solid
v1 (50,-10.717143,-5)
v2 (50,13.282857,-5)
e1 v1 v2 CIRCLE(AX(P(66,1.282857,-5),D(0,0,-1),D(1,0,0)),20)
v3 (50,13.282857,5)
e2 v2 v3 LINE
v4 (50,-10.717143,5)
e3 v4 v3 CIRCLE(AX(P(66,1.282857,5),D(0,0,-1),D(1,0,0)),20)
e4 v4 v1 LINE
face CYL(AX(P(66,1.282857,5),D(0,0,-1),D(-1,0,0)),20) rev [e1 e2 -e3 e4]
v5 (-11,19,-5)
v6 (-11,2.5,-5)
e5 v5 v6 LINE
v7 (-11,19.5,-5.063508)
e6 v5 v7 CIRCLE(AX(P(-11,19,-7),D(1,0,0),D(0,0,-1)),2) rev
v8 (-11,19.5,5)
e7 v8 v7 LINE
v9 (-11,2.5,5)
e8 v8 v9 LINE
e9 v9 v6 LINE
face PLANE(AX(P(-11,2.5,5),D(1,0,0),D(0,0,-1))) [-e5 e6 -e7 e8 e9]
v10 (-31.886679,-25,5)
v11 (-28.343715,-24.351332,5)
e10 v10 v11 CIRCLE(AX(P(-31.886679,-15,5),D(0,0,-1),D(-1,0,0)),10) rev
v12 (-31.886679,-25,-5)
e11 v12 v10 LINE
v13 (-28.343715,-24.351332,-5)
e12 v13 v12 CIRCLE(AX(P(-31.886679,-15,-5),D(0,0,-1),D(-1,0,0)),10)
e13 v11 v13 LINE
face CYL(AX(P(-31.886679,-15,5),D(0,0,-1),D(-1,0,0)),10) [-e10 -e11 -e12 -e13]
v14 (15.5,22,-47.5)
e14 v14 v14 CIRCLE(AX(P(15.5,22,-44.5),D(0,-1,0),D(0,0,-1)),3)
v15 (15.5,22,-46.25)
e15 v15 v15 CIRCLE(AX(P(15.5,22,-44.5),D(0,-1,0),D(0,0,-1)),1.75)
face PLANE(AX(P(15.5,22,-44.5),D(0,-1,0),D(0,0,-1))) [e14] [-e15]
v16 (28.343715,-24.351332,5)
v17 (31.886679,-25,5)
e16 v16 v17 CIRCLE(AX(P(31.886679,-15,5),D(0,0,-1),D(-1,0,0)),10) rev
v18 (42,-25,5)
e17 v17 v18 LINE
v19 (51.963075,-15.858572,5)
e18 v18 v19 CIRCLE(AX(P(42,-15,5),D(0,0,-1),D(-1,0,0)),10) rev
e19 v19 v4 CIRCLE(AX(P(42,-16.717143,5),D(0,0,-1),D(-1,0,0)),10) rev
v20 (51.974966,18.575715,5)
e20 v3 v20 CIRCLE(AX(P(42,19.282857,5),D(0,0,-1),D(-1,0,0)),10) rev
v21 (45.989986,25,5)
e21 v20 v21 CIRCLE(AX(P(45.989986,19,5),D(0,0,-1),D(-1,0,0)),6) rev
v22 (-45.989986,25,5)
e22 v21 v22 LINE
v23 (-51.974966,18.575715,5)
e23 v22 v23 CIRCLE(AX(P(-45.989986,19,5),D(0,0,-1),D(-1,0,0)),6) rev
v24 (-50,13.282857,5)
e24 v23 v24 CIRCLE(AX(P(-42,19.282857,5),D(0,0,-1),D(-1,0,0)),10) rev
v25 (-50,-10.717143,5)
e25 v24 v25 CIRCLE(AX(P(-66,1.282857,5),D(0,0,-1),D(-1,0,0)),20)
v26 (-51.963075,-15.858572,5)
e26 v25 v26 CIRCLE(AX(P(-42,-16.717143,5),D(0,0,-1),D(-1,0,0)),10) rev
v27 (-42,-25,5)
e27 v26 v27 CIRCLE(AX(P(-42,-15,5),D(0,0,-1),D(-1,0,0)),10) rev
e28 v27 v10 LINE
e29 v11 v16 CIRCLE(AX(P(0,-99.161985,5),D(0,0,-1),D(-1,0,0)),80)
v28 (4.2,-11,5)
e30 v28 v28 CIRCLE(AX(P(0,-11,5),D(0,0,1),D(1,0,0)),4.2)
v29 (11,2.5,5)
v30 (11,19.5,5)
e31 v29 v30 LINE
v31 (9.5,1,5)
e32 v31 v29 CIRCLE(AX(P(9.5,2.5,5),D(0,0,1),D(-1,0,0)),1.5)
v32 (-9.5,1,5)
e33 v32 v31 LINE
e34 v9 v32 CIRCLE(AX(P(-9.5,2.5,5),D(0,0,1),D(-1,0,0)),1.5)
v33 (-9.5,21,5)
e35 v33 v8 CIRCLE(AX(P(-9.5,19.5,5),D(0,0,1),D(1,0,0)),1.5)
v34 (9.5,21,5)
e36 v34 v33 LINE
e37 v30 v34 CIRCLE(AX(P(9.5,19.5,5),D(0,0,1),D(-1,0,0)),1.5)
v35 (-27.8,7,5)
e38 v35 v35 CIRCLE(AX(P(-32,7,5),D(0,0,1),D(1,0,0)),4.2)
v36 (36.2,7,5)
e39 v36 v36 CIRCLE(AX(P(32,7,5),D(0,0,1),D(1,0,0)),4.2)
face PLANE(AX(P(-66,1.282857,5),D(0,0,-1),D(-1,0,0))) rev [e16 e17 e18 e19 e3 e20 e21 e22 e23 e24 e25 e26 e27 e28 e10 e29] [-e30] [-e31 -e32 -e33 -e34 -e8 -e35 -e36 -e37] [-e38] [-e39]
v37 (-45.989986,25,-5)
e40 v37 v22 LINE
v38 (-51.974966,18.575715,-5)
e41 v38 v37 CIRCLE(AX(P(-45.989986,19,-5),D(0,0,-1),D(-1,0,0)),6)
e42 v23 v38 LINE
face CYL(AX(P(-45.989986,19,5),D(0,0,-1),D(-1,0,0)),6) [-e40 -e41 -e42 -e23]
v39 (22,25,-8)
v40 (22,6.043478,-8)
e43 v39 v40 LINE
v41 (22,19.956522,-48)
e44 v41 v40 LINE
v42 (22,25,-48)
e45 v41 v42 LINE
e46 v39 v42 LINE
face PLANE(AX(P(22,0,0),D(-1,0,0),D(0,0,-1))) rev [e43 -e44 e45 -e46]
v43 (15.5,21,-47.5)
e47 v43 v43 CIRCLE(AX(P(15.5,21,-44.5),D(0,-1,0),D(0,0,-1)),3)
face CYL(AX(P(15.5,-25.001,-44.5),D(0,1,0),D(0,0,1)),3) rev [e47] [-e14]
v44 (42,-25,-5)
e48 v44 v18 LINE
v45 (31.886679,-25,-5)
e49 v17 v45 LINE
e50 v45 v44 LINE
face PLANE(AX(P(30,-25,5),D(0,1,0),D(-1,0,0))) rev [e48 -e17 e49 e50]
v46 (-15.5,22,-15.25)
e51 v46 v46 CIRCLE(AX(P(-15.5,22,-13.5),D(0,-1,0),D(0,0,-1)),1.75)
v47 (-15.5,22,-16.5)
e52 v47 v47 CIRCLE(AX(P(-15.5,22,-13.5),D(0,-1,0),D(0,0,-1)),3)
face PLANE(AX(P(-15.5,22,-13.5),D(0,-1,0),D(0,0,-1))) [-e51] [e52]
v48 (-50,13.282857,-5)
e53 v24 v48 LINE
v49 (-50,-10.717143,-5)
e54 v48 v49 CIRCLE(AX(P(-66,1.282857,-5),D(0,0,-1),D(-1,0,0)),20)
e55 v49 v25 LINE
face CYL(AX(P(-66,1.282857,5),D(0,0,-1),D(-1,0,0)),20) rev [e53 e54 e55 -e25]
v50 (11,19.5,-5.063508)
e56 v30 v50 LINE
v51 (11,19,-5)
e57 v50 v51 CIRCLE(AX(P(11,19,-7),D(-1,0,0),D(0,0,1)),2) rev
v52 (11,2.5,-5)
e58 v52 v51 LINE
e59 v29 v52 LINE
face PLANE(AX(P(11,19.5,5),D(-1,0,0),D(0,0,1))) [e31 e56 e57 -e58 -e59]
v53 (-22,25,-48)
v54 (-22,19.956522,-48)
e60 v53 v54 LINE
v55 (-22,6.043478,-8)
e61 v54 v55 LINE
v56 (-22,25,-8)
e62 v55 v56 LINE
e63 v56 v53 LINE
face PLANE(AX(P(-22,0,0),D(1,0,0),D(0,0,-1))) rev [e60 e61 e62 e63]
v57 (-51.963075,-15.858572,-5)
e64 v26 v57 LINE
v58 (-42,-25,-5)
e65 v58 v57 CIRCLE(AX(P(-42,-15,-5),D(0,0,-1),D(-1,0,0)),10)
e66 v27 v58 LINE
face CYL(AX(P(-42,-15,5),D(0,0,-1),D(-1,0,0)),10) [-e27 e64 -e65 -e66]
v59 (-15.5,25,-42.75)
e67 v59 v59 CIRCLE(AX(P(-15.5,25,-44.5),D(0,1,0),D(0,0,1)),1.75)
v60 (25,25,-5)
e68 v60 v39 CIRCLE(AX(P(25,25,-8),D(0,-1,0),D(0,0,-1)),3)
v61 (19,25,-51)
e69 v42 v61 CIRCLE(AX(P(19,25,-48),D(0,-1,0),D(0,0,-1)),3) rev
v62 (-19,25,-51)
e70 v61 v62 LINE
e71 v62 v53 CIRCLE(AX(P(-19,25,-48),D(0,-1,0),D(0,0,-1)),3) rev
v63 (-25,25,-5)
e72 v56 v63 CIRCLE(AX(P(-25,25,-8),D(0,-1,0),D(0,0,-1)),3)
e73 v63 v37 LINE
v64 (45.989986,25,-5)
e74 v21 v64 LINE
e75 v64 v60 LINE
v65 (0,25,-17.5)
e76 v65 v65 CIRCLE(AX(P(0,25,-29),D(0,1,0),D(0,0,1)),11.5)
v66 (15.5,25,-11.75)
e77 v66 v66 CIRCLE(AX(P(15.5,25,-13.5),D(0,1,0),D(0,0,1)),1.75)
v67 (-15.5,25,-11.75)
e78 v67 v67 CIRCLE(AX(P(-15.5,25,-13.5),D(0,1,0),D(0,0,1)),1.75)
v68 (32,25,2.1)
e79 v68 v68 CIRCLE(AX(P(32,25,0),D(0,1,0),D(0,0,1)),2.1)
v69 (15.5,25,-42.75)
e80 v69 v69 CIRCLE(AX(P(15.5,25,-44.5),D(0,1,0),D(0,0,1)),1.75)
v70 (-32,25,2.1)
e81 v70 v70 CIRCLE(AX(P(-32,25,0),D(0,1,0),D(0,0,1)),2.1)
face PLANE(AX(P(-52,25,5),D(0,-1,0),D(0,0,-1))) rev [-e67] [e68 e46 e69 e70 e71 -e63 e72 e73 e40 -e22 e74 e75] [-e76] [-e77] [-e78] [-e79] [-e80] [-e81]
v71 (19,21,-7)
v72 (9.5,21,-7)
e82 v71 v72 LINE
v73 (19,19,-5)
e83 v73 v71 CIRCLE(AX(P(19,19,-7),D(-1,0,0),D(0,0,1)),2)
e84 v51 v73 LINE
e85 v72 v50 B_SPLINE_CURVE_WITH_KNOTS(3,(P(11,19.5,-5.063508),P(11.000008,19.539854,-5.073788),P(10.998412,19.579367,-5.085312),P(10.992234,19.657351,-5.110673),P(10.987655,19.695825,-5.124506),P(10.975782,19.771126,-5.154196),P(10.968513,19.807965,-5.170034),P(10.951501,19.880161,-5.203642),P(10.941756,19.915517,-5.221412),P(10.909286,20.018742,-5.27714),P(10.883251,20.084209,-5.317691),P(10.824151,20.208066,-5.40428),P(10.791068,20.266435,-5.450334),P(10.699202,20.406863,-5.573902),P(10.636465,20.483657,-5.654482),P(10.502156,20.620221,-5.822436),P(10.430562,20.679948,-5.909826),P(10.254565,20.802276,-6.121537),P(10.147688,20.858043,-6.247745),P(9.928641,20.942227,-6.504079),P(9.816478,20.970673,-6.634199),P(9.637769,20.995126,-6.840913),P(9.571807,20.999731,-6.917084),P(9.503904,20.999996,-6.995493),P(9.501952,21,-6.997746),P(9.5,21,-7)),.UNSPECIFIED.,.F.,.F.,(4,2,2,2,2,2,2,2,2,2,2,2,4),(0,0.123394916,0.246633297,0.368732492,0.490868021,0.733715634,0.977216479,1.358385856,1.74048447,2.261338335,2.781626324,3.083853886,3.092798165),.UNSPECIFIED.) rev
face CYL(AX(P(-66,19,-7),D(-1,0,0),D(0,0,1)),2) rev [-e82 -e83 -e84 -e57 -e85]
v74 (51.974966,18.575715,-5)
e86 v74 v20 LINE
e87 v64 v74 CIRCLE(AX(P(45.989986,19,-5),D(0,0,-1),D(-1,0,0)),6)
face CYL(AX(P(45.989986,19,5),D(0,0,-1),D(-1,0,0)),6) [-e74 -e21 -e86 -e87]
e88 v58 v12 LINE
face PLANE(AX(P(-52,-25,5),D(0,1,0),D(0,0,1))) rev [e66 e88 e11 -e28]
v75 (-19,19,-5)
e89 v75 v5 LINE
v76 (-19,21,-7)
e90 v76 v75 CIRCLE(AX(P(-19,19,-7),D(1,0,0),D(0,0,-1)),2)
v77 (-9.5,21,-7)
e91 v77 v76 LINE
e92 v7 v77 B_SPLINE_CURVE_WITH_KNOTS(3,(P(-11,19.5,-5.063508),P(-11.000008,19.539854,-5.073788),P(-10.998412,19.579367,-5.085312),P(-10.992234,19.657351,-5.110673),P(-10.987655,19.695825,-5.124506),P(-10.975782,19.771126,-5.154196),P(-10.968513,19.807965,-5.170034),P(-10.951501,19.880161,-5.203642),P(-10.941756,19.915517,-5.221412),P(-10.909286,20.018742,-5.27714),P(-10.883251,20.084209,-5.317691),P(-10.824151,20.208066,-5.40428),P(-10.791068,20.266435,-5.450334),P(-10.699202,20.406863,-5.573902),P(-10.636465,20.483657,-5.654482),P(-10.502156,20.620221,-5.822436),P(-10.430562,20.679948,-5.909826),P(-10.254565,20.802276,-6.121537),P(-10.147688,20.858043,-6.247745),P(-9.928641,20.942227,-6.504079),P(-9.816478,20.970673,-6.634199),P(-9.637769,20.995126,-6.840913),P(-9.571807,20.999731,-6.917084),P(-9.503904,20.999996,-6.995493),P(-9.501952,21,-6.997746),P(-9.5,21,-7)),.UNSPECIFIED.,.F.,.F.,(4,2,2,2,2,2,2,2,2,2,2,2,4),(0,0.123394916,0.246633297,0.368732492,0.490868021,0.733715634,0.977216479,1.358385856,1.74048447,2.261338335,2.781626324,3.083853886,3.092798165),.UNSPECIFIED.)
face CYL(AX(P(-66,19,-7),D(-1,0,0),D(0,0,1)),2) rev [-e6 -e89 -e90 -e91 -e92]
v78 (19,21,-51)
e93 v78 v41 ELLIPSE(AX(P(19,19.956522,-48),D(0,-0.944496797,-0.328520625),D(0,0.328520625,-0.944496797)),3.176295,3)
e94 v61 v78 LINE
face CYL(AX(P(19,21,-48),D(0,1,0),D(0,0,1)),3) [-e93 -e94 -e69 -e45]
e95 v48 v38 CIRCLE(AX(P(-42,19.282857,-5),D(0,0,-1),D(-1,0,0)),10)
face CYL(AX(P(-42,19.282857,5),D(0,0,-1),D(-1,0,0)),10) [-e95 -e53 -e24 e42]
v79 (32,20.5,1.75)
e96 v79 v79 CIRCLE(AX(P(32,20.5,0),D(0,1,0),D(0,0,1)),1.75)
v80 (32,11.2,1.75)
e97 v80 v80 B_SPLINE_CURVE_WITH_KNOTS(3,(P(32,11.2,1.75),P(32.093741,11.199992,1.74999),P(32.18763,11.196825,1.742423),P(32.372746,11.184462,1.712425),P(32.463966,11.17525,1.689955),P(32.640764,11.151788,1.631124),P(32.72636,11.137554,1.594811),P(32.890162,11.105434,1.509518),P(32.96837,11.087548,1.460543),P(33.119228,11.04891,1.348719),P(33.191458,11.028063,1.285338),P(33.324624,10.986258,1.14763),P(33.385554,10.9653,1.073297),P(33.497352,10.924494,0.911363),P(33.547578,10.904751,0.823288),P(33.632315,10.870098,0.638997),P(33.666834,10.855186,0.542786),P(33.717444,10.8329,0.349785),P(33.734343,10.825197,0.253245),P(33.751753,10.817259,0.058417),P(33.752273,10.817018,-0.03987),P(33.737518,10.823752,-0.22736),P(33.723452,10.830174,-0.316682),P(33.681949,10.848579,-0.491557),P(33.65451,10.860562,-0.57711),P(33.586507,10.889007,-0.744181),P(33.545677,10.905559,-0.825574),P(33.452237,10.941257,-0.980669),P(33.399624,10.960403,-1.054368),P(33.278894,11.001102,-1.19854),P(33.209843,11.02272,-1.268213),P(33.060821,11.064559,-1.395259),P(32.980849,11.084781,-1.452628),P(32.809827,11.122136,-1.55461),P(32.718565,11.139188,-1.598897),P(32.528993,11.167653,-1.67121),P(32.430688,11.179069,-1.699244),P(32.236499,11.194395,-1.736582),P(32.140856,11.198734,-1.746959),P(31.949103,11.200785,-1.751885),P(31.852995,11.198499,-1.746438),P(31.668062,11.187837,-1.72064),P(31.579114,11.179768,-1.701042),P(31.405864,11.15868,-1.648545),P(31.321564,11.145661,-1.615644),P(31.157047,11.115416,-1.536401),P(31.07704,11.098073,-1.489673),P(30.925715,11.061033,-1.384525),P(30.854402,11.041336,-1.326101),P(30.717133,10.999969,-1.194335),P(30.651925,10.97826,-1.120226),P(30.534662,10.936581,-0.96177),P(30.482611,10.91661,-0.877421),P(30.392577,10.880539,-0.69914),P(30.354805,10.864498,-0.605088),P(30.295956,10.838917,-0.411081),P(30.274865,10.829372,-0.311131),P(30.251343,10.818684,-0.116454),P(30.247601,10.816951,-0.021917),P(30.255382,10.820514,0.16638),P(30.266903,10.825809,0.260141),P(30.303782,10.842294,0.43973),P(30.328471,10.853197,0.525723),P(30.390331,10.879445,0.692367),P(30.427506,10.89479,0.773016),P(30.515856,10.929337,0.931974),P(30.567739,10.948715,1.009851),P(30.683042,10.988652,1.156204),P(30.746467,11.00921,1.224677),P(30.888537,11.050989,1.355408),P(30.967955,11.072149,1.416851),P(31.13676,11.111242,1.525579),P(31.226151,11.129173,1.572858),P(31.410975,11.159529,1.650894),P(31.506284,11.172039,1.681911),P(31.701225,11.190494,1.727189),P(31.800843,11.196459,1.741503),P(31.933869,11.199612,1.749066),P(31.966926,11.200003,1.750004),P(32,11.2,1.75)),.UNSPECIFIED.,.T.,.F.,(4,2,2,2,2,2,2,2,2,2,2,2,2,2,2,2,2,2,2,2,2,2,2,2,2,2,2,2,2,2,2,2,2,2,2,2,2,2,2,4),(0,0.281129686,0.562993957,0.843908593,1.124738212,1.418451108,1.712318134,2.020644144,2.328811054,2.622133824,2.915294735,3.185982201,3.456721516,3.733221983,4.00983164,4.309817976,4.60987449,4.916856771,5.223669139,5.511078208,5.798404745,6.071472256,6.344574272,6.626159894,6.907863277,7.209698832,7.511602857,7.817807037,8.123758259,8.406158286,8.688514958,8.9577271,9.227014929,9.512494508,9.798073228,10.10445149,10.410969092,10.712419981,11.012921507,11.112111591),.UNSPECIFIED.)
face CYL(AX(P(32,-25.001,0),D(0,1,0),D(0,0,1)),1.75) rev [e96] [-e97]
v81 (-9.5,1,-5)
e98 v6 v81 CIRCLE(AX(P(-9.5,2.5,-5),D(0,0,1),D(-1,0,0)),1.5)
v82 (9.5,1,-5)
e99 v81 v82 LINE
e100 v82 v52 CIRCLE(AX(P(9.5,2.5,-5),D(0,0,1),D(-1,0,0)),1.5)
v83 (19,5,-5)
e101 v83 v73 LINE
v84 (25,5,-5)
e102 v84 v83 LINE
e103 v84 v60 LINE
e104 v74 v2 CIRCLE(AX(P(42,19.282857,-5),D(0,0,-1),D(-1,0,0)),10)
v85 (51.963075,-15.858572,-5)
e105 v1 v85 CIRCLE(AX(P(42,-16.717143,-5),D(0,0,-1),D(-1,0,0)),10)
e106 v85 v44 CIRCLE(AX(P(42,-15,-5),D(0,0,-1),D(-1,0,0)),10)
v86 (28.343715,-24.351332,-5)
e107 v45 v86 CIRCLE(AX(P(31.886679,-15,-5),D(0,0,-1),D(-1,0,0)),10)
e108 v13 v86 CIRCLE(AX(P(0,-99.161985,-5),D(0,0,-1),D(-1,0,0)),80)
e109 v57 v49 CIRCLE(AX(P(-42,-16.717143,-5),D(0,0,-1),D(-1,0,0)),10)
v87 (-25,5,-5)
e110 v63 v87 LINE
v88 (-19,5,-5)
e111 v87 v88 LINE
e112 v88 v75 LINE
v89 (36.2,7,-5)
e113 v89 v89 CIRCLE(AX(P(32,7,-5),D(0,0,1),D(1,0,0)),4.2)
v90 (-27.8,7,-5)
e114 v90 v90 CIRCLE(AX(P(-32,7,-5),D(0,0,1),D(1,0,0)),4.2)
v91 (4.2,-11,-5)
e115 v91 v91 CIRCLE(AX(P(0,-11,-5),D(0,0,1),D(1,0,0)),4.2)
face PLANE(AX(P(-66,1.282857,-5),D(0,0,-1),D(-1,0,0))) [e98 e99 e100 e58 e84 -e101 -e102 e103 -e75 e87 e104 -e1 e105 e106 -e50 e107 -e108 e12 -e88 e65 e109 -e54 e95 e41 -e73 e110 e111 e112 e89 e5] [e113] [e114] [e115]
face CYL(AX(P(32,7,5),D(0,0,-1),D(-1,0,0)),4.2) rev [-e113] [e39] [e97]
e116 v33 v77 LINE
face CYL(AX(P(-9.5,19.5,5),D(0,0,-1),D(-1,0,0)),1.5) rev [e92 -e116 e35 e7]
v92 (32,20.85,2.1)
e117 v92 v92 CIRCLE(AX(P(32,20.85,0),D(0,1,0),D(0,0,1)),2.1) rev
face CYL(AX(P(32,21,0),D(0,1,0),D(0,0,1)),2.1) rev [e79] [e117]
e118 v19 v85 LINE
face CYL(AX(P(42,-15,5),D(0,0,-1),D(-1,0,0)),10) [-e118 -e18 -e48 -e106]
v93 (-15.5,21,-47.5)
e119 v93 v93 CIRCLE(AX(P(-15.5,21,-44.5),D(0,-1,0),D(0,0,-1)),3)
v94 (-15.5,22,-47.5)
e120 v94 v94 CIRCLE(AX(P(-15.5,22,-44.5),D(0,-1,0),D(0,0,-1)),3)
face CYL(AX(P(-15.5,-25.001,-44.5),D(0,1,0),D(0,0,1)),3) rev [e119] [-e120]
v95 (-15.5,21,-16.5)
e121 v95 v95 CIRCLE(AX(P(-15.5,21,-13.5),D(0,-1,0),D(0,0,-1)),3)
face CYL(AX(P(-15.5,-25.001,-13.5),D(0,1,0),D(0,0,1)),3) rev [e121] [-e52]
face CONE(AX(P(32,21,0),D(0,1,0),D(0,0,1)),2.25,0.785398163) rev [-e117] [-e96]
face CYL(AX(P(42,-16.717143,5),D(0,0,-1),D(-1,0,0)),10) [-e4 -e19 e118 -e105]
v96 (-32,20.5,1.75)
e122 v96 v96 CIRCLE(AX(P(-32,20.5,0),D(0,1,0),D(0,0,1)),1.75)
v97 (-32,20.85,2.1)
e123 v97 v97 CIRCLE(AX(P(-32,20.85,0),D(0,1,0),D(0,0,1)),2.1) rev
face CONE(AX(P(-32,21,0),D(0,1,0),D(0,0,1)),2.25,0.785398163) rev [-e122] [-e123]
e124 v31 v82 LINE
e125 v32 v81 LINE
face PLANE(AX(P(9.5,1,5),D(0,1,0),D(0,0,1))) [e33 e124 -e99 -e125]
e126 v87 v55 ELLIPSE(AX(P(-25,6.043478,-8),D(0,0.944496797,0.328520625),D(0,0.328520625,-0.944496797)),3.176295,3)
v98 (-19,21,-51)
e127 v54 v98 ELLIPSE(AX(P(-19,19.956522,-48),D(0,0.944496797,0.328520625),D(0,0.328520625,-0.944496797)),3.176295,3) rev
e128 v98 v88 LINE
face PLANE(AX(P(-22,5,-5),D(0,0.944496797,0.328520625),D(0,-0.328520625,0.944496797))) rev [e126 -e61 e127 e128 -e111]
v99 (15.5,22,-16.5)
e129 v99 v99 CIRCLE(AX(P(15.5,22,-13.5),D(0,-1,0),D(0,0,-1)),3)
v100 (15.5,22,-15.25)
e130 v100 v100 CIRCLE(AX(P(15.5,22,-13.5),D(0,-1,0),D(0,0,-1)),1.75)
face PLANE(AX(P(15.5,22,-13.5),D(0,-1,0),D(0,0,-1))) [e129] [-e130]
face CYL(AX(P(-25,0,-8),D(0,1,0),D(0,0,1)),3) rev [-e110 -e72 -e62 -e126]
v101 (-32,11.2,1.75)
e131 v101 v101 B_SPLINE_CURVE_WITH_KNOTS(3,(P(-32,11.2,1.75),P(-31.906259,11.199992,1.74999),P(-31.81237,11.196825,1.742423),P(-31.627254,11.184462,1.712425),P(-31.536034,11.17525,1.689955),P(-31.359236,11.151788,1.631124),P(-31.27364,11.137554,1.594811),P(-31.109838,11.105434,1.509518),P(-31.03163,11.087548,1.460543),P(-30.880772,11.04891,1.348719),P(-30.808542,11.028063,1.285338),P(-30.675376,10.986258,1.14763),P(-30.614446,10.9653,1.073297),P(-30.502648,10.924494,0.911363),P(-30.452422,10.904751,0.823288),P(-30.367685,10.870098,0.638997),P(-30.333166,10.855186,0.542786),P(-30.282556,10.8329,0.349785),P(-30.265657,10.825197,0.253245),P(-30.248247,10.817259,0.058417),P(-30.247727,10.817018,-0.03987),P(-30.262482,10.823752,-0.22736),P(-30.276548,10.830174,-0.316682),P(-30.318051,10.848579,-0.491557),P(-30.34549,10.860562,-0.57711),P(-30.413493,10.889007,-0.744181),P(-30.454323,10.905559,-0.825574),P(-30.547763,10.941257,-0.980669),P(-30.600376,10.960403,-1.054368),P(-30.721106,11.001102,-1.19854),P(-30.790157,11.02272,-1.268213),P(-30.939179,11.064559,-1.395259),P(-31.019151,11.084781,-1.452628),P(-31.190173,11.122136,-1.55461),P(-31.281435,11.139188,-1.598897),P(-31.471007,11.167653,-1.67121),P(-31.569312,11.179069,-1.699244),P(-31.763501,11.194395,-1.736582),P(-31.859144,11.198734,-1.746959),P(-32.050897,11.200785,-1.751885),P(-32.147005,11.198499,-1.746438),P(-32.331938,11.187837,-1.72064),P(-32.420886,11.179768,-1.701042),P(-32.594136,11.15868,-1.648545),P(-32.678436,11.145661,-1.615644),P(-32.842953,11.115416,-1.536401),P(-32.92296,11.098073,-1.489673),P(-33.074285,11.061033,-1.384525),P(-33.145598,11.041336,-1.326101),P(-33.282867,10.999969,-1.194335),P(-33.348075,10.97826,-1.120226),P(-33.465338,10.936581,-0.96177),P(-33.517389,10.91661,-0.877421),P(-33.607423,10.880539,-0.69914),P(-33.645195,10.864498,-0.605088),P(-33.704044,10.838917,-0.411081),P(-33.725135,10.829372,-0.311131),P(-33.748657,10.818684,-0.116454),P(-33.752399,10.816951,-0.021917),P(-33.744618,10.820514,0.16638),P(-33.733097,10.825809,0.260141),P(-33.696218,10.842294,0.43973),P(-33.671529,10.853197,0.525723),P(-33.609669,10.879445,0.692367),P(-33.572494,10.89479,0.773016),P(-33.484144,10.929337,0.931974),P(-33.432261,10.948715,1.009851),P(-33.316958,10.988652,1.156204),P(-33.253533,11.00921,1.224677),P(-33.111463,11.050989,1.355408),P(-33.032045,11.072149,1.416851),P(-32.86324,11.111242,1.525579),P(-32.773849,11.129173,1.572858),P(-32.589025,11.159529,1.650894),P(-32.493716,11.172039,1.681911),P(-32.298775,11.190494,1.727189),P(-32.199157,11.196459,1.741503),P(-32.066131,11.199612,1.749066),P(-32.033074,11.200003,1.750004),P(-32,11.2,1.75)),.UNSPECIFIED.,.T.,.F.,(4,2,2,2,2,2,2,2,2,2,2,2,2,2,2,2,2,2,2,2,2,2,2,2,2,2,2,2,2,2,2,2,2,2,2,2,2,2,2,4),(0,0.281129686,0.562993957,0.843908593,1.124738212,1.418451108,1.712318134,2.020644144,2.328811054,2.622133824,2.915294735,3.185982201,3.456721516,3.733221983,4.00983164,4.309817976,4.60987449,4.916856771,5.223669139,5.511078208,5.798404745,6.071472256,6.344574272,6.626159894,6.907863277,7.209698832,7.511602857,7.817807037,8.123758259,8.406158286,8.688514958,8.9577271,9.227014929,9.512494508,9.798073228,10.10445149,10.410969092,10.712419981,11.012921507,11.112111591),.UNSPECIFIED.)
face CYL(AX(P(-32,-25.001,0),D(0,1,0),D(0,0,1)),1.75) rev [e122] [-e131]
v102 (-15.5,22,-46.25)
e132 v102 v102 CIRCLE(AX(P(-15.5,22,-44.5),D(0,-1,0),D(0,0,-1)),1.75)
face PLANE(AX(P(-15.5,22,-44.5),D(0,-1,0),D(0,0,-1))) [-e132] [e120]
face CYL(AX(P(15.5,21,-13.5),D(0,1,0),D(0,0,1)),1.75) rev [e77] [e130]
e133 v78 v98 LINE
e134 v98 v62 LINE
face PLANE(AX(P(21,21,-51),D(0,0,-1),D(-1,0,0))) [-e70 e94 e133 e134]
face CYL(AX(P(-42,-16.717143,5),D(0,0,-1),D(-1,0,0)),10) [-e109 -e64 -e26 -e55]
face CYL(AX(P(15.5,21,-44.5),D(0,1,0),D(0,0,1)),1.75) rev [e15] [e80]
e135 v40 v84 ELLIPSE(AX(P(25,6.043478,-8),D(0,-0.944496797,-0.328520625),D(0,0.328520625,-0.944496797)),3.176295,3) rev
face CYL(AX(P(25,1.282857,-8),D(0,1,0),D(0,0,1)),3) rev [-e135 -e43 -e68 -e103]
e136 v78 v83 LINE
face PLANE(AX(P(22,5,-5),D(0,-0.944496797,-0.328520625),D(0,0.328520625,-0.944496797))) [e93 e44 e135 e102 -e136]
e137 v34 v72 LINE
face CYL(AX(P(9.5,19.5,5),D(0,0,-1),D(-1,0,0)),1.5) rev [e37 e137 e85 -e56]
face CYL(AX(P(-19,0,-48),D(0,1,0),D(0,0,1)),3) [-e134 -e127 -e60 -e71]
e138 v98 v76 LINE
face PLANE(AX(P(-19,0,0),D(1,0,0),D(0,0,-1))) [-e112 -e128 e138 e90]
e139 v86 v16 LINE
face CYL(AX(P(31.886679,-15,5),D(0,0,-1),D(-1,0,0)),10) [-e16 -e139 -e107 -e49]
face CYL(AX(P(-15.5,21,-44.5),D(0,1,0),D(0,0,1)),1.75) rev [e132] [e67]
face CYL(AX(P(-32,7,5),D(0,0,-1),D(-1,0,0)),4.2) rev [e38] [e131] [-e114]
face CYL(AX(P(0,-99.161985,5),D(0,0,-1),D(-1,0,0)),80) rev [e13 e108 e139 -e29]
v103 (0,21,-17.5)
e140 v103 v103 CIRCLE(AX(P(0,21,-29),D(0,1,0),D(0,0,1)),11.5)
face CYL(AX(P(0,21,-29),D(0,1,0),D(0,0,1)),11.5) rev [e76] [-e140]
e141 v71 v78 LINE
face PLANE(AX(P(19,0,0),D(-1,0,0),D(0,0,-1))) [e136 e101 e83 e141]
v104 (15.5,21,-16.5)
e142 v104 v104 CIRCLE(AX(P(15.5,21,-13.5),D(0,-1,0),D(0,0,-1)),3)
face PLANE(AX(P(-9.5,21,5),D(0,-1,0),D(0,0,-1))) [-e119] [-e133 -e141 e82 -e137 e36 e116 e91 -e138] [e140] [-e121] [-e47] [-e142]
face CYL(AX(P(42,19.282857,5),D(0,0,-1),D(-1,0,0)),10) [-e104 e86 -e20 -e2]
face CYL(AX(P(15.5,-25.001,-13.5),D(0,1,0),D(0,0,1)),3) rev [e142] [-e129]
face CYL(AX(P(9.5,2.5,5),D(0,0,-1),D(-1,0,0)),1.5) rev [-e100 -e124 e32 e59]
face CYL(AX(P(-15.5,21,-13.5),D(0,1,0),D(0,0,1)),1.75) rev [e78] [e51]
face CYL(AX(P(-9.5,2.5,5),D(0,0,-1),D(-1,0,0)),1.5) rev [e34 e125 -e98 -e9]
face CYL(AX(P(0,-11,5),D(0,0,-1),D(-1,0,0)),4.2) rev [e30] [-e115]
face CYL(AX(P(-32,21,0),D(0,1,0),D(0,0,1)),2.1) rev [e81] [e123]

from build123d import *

# Parameters (mm, degrees)
SKETCH1_R           = 4.2
BOSS_EXTRUDE1_DEPTH = 5
FILLET1_R           = 10
FILLET2_R           = 6
SKETCH2_W           = 42
SKETCH2_H           = 46
SKETCH2_R           = 11.5
SKETCH2_R_2         = 1.75
BOSS_EXTRUDE2_DEPTH = 4
CUT_EXTRUDE1_REACH  = 89.139
CUT_EXTRUDE1_START  = -1
SKETCH3_R           = 3
CUT_EXTRUDE2_REACH  = 90.34
SKETCH4_R           = 1.75
SKETCH5_R           = 2.1
CUT_EXTRUDE3_DEPTH  = 4
CHAMFER1_SIZE       = 0.5
BOSS_EXTRUDE3_START = -2
BOSS_EXTRUDE3_DEPTH = 3
FILLET3_R           = 2
FILLET4_R           = 3


with BuildPart() as part:
    # Sketch1 → Boss-Extrude1 (new, symmetric)
    with BuildSketch(Plane.XY):
        with BuildLine():
            Line((-52, 25), (52, 25))
            Line((52, 25), (52, 15.565713714))
            ThreePointArc((52, 15.565713714), (46, 1.282856857), (52, -13))
            Line((52, -13), (52, -25))
            Line((52, -25), (30, -25))
            ThreePointArc((30, -25), (0, -19.161984871), (-30, -25))
            Line((-30, -25), (-52, -25))
            Line((-52, -25), (-52, -13))
            ThreePointArc((-52, -13), (-46, 1.282856857), (-52, 15.565713714))
            Line((-52, 15.565713714), (-52, 25))
        make_face()
        with Locations((0, -11)):
            Circle(SKETCH1_R, mode=Mode.SUBTRACT)
        with Locations((-32, 7)):
            Circle(SKETCH1_R, mode=Mode.SUBTRACT)
        with Locations((32, 7)):
            Circle(SKETCH1_R, mode=Mode.SUBTRACT)
        with BuildLine():
            Line((-9.5, 21), (9.5, 21))
            ThreePointArc((9.5, 21), (10.560660172, 20.560660172), (11, 19.5))
            Line((11, 19.5), (11, 2.5))
            ThreePointArc((11, 2.5), (10.560660172, 1.439339828), (9.5, 1))
            Line((9.5, 1), (-9.5, 1))
            ThreePointArc((-9.5, 1), (-10.560660172, 1.439339828), (-11, 2.5))
            Line((-11, 2.5), (-11, 19.5))
            ThreePointArc((-11, 19.5), (-10.560660172, 20.560660172), (-9.5, 21))
        make_face(mode=Mode.SUBTRACT)
    extrude(amount=BOSS_EXTRUDE1_DEPTH, both=True)

    # Fillet1
    # the kernel refuses this fillet: 10 mm, written as the material it takes off along each edge
    with BuildSketch(Plane(origin=(52, 15.565713714, 14.292857857), x_dir=(-0.6589710561597435, -0.7521682970876347, 0), z_dir=(0, 0, -1))) as fillet1_piece_1:
        with BuildLine():
            CenterArc((3.793793334, 9.971172714), FILLET1_R, 228.778553177, 36.869897646)
            Line((-2.795917228, 2.449489743), (0, 0))
            ThreePointArc((0, 0), (1.517517334, 0.057654573), (3.035034667, 0))
        make_face()
    extrude(amount=28.585715715, mode=Mode.SUBTRACT)
    with BuildSketch(Plane(origin=(52, -13, 14.292857857), x_dir=(0, -1, 0), z_dir=(0, 0, -1)), Plane(origin=(-52, -13, -14.292857857), x_dir=(0, -1, 0), z_dir=(0, 0, 1))) as fillet1_piece_2:
        with BuildLine():
            CenterArc((3.717143143, 10), FILLET1_R, 233.130102354, 36.869897646)
            ThreePointArc((-2.282856857, 2), (-1.103435734, 1.043365942), (0, 0))
            Line((0, 0), (3.717143143, 0))
        make_face()
    extrude(amount=28.585715715, mode=Mode.SUBTRACT)
    with BuildSketch(Plane(origin=(52, -25, 30), x_dir=(-1, 0, 0), z_dir=(0, 0, -1))) as fillet1_piece_3:
        with BuildLine():
            CenterArc((FILLET1_R, FILLET1_R), FILLET1_R, 180, 90)
            Line((0, FILLET1_R), (0, 0))
            Line((0, 0), (FILLET1_R, 0))
        make_face()
    extrude(amount=60, mode=Mode.SUBTRACT)
    with BuildSketch(Plane(origin=(30, -25, 9.716697693), x_dir=(-0.931136532102541, 0.3646707536724787, 0), z_dir=(0, 0, -1))) as fillet1_piece_4:
        with BuildLine():
            CenterArc((1.889951723, 9.999382002), FILLET1_R, 248.612678269, 20.750330625)
            Line((-1.756755813, 0.688016681), (0, 0))
            ThreePointArc((0, 0), (0.889389046, 0.004943983), (1.778778093, 0))
        make_face()
    extrude(amount=19.433395387, mode=Mode.SUBTRACT)
    with BuildSketch(Plane(origin=(-30, -25, 9.716697693), x_dir=(-1, 0, 0), z_dir=(0, 0, -1))) as fillet1_piece_5:
        with BuildLine():
            CenterArc((1.886679077, 10), FILLET1_R, 249.249669375, 20.750330625)
            ThreePointArc((-1.656285265, 0.648668348), (-0.826339706, 0.328937697), (0, 0))
            Line((0, 0), (1.886679077, 0))
        make_face()
    extrude(amount=19.433395387, mode=Mode.SUBTRACT)
    with BuildSketch(Plane(origin=(-52, -25, -30), x_dir=(0, 1, 0), z_dir=(0, 0, 1))) as fillet1_piece_6:
        with BuildLine():
            CenterArc((FILLET1_R, -FILLET1_R), FILLET1_R, 90, 90)
            Line((0, -FILLET1_R), (0, 0))
            Line((0, 0), (FILLET1_R, 0))
        make_face()
    extrude(amount=60, mode=Mode.SUBTRACT)
    with BuildSketch(Plane(origin=(-52, 15.565713714, -14.292857857), x_dir=(0, 1, 0), z_dir=(0, 0, 1))) as fillet1_piece_7:
        with BuildLine():
            CenterArc((3.717143143, -10), FILLET1_R, 90, 36.869897646)
            ThreePointArc((-2.282856857, -2), (-1.103435734, -1.043365942), (0, 0))
            Line((0, 0), (3.717143143, 0))
        make_face()
    extrude(amount=28.585715715, mode=Mode.SUBTRACT)

    # Fillet2
    fillet2_edges = [part.edges().sort_by_distance(p)[0] for p in [
        (52, 25, 0),
        (-52, 25, 0),
    ]]
    fillet(fillet2_edges, radius=FILLET2_R)

    # Sketch2 → Boss-Extrude2 (add)
    with BuildSketch(Plane(origin=(0, 25, -30), x_dir=(-1, 0, 0), z_dir=(0, 1, 0))):
        with Locations((0, 2)):
            Rectangle(SKETCH2_W, SKETCH2_H)
        with Locations(Location((0, 1, 0), (0, 0, 90))):
            Circle(SKETCH2_R, mode=Mode.SUBTRACT)
        with Locations(Location((15.5, 16.5, 0), (0, 0, 90))):
            Circle(SKETCH2_R_2, mode=Mode.SUBTRACT)
        with Locations(Location((-15.5, 16.5, 0), (0, 0, 90))):
            Circle(SKETCH2_R_2, mode=Mode.SUBTRACT)
        with Locations(Location((-15.5, -14.5, 0), (0, 0, 90))):
            Circle(SKETCH2_R_2, mode=Mode.SUBTRACT)
        with Locations(Location((15.5, -14.5, 0), (0, 0, 90))):
            Circle(SKETCH2_R_2, mode=Mode.SUBTRACT)
    extrude(amount=-BOSS_EXTRUDE2_DEPTH)

    # Sketch3 → Cut-Extrude1 (cut, up to next)
    with BuildSketch(Plane.XZ.offset(-21).offset(CUT_EXTRUDE1_START), mode=Mode.PRIVATE) as cut_extrude1_sk1:
        with Locations(Location((-15.5, -44.5, 0), (0, 0, 270))):
            Circle(SKETCH3_R)
    cut_extrude1_tool1 = extrude(cut_extrude1_sk1.sketch, amount=CUT_EXTRUDE1_REACH, mode=Mode.PRIVATE) & part.part
    # Sketch3 → Cut-Extrude1 (cut, up to next)
    with BuildSketch(Plane.XZ.offset(-21).offset(CUT_EXTRUDE1_START), mode=Mode.PRIVATE) as cut_extrude1_sk2:
        with Locations(Location((15.5, -44.5, 0), (0, 0, 270))):
            Circle(SKETCH3_R)
    cut_extrude1_tool2 = extrude(cut_extrude1_sk2.sketch, amount=CUT_EXTRUDE1_REACH, mode=Mode.PRIVATE) & part.part
    # Sketch3 → Cut-Extrude1 (cut, up to next)
    with BuildSketch(Plane.XZ.offset(-21).offset(CUT_EXTRUDE1_START), mode=Mode.PRIVATE) as cut_extrude1_sk3:
        with Locations(Location((15.5, -13.5, 0), (0, 0, 270))):
            Circle(SKETCH3_R)
    cut_extrude1_tool3 = extrude(cut_extrude1_sk3.sketch, amount=CUT_EXTRUDE1_REACH, mode=Mode.PRIVATE) & part.part
    # Sketch3 → Cut-Extrude1 (cut, up to next)
    with BuildSketch(Plane.XZ.offset(-21).offset(CUT_EXTRUDE1_START), mode=Mode.PRIVATE) as cut_extrude1_sk4:
        with Locations(Location((-15.5, -13.5, 0), (0, 0, 270))):
            Circle(SKETCH3_R)
    cut_extrude1_tool4 = extrude(cut_extrude1_sk4.sketch, amount=CUT_EXTRUDE1_REACH, mode=Mode.PRIVATE) & part.part
    add(cut_extrude1_tool1.solids().sort_by_distance((-15.5, 22, -44.5))[0], mode=Mode.SUBTRACT)
    add(cut_extrude1_tool2.solids().sort_by_distance((15.5, 22, -44.5))[0], mode=Mode.SUBTRACT)
    add(cut_extrude1_tool3.solids().sort_by_distance((15.5, 22, -13.5))[0], mode=Mode.SUBTRACT)
    add(cut_extrude1_tool4.solids().sort_by_distance((-15.5, 22, -13.5))[0], mode=Mode.SUBTRACT)

    # Sketch4 → Cut-Extrude2 (cut, up to next)
    with BuildSketch(Plane(origin=(0, 25, 0), x_dir=(1, 0, 0), z_dir=(0, 1, 0)), mode=Mode.PRIVATE) as cut_extrude2_sk1:
        with Locations(Location((-32, 0, 0), (0, 0, 270))):
            Circle(SKETCH4_R)
    cut_extrude2_tool1 = extrude(cut_extrude2_sk1.sketch, amount=-CUT_EXTRUDE2_REACH, mode=Mode.PRIVATE) & part.part
    # Sketch4 → Cut-Extrude2 (cut, up to next)
    with BuildSketch(Plane(origin=(0, 25, 0), x_dir=(1, 0, 0), z_dir=(0, 1, 0)), mode=Mode.PRIVATE) as cut_extrude2_sk2:
        with Locations(Location((32, 0, 0), (0, 0, 270))):
            Circle(SKETCH4_R)
    cut_extrude2_tool2 = extrude(cut_extrude2_sk2.sketch, amount=-CUT_EXTRUDE2_REACH, mode=Mode.PRIVATE) & part.part
    add(cut_extrude2_tool1.solids().sort_by_distance((-32, 25, 0))[0], mode=Mode.SUBTRACT)
    add(cut_extrude2_tool2.solids().sort_by_distance((32, 25, 0))[0], mode=Mode.SUBTRACT)

    # Sketch5 → Cut-Extrude3 (cut)
    with BuildSketch(Plane(origin=(0, 25, 0), x_dir=(1, 0, 0), z_dir=(0, 1, 0))):
        with Locations(Location((-32, 0, 0), (0, 0, 270))):
            Circle(SKETCH5_R)
        with Locations(Location((32, 0, 0), (0, 0, 270))):
            Circle(SKETCH5_R)
    extrude(amount=-CUT_EXTRUDE3_DEPTH, mode=Mode.SUBTRACT)

    # Chamfer1
    # the kernel refuses this chamfer: 0.5 mm, written as the material it adds along each edge
    # the kernel refuses this chamfer: 0.5 mm, written as the material it takes off along each edge
    with BuildSketch(Plane(origin=(-32, 21, 0), x_dir=(0, 0, 1), z_dir=(-1, 0, 0))) as chamfer1_2_piece_1_section:
        Polygon((1.75, -CHAMFER1_SIZE), (1.75 + CHAMFER1_SIZE, 0), (1.75, 0), align=None)
    chamfer1_2_piece_1 = revolve(axis=Axis((-32, 21, 0), (0, 1, 0)), mode=Mode.PRIVATE)
    chamfer1_2_piece_1 = chamfer1_2_piece_1 & Plane(origin=(-32, 20.682821512, 0), x_dir=(0, 0, 1), z_dir=(0, 1, 0)) * Cylinder(2.1, 9, mode=Mode.PRIVATE)
    add(chamfer1_2_piece_1, mode=Mode.SUBTRACT)
    with BuildSketch(Plane(origin=(32, 21, 0), x_dir=(0, 0, 1), z_dir=(-1, 0, 0))) as chamfer1_2_piece_2_section:
        Polygon((1.75, -CHAMFER1_SIZE), (1.75 + CHAMFER1_SIZE, 0), (1.75, 0), align=None)
    chamfer1_2_piece_2 = revolve(axis=Axis((32, 21, 0), (0, 1, 0)), mode=Mode.PRIVATE)
    chamfer1_2_piece_2 = chamfer1_2_piece_2 & Plane(origin=(32, 20.682821512, 0), x_dir=(0, 0, 1), z_dir=(0, 1, 0)) * Cylinder(2.1, 10, mode=Mode.PRIVATE)
    add(chamfer1_2_piece_2, mode=Mode.SUBTRACT)

    # Sketch6 → Boss-Extrude3 (add)
    with BuildSketch(Plane.ZY.offset(21).offset(BOSS_EXTRUDE3_START)):
        Polygon((-51, 25), (-5, 25), (-5, 5), (-51, 21), align=None)
    boss_extrude3 = extrude(amount=BOSS_EXTRUDE3_DEPTH)

    # Mirror1: Boss-Extrude3 across plane
    add(boss_extrude3.mirror(Plane(origin=(0, 0, 0), x_dir=(0, 0, 1), z_dir=(1, 0, 0))))

    # Fillet3
    fillet3_edges = [part.edges().sort_by_distance(p)[0] for p in [
        (-14.25, 21, -5),
        (14.25, 21, -5),
    ]]
    fillet(fillet3_edges, radius=FILLET3_R)

    # Fillet4
    fillet4_edges = [part.edges().sort_by_distance(p)[0] for p in [
        (-22, 23, -51),
        (22, 23, -51),
        (-22, 15, -5),
        (22, 15, -5),
    ]]
    fillet(fillet4_edges, radius=FILLET4_R)


solid = part.part
